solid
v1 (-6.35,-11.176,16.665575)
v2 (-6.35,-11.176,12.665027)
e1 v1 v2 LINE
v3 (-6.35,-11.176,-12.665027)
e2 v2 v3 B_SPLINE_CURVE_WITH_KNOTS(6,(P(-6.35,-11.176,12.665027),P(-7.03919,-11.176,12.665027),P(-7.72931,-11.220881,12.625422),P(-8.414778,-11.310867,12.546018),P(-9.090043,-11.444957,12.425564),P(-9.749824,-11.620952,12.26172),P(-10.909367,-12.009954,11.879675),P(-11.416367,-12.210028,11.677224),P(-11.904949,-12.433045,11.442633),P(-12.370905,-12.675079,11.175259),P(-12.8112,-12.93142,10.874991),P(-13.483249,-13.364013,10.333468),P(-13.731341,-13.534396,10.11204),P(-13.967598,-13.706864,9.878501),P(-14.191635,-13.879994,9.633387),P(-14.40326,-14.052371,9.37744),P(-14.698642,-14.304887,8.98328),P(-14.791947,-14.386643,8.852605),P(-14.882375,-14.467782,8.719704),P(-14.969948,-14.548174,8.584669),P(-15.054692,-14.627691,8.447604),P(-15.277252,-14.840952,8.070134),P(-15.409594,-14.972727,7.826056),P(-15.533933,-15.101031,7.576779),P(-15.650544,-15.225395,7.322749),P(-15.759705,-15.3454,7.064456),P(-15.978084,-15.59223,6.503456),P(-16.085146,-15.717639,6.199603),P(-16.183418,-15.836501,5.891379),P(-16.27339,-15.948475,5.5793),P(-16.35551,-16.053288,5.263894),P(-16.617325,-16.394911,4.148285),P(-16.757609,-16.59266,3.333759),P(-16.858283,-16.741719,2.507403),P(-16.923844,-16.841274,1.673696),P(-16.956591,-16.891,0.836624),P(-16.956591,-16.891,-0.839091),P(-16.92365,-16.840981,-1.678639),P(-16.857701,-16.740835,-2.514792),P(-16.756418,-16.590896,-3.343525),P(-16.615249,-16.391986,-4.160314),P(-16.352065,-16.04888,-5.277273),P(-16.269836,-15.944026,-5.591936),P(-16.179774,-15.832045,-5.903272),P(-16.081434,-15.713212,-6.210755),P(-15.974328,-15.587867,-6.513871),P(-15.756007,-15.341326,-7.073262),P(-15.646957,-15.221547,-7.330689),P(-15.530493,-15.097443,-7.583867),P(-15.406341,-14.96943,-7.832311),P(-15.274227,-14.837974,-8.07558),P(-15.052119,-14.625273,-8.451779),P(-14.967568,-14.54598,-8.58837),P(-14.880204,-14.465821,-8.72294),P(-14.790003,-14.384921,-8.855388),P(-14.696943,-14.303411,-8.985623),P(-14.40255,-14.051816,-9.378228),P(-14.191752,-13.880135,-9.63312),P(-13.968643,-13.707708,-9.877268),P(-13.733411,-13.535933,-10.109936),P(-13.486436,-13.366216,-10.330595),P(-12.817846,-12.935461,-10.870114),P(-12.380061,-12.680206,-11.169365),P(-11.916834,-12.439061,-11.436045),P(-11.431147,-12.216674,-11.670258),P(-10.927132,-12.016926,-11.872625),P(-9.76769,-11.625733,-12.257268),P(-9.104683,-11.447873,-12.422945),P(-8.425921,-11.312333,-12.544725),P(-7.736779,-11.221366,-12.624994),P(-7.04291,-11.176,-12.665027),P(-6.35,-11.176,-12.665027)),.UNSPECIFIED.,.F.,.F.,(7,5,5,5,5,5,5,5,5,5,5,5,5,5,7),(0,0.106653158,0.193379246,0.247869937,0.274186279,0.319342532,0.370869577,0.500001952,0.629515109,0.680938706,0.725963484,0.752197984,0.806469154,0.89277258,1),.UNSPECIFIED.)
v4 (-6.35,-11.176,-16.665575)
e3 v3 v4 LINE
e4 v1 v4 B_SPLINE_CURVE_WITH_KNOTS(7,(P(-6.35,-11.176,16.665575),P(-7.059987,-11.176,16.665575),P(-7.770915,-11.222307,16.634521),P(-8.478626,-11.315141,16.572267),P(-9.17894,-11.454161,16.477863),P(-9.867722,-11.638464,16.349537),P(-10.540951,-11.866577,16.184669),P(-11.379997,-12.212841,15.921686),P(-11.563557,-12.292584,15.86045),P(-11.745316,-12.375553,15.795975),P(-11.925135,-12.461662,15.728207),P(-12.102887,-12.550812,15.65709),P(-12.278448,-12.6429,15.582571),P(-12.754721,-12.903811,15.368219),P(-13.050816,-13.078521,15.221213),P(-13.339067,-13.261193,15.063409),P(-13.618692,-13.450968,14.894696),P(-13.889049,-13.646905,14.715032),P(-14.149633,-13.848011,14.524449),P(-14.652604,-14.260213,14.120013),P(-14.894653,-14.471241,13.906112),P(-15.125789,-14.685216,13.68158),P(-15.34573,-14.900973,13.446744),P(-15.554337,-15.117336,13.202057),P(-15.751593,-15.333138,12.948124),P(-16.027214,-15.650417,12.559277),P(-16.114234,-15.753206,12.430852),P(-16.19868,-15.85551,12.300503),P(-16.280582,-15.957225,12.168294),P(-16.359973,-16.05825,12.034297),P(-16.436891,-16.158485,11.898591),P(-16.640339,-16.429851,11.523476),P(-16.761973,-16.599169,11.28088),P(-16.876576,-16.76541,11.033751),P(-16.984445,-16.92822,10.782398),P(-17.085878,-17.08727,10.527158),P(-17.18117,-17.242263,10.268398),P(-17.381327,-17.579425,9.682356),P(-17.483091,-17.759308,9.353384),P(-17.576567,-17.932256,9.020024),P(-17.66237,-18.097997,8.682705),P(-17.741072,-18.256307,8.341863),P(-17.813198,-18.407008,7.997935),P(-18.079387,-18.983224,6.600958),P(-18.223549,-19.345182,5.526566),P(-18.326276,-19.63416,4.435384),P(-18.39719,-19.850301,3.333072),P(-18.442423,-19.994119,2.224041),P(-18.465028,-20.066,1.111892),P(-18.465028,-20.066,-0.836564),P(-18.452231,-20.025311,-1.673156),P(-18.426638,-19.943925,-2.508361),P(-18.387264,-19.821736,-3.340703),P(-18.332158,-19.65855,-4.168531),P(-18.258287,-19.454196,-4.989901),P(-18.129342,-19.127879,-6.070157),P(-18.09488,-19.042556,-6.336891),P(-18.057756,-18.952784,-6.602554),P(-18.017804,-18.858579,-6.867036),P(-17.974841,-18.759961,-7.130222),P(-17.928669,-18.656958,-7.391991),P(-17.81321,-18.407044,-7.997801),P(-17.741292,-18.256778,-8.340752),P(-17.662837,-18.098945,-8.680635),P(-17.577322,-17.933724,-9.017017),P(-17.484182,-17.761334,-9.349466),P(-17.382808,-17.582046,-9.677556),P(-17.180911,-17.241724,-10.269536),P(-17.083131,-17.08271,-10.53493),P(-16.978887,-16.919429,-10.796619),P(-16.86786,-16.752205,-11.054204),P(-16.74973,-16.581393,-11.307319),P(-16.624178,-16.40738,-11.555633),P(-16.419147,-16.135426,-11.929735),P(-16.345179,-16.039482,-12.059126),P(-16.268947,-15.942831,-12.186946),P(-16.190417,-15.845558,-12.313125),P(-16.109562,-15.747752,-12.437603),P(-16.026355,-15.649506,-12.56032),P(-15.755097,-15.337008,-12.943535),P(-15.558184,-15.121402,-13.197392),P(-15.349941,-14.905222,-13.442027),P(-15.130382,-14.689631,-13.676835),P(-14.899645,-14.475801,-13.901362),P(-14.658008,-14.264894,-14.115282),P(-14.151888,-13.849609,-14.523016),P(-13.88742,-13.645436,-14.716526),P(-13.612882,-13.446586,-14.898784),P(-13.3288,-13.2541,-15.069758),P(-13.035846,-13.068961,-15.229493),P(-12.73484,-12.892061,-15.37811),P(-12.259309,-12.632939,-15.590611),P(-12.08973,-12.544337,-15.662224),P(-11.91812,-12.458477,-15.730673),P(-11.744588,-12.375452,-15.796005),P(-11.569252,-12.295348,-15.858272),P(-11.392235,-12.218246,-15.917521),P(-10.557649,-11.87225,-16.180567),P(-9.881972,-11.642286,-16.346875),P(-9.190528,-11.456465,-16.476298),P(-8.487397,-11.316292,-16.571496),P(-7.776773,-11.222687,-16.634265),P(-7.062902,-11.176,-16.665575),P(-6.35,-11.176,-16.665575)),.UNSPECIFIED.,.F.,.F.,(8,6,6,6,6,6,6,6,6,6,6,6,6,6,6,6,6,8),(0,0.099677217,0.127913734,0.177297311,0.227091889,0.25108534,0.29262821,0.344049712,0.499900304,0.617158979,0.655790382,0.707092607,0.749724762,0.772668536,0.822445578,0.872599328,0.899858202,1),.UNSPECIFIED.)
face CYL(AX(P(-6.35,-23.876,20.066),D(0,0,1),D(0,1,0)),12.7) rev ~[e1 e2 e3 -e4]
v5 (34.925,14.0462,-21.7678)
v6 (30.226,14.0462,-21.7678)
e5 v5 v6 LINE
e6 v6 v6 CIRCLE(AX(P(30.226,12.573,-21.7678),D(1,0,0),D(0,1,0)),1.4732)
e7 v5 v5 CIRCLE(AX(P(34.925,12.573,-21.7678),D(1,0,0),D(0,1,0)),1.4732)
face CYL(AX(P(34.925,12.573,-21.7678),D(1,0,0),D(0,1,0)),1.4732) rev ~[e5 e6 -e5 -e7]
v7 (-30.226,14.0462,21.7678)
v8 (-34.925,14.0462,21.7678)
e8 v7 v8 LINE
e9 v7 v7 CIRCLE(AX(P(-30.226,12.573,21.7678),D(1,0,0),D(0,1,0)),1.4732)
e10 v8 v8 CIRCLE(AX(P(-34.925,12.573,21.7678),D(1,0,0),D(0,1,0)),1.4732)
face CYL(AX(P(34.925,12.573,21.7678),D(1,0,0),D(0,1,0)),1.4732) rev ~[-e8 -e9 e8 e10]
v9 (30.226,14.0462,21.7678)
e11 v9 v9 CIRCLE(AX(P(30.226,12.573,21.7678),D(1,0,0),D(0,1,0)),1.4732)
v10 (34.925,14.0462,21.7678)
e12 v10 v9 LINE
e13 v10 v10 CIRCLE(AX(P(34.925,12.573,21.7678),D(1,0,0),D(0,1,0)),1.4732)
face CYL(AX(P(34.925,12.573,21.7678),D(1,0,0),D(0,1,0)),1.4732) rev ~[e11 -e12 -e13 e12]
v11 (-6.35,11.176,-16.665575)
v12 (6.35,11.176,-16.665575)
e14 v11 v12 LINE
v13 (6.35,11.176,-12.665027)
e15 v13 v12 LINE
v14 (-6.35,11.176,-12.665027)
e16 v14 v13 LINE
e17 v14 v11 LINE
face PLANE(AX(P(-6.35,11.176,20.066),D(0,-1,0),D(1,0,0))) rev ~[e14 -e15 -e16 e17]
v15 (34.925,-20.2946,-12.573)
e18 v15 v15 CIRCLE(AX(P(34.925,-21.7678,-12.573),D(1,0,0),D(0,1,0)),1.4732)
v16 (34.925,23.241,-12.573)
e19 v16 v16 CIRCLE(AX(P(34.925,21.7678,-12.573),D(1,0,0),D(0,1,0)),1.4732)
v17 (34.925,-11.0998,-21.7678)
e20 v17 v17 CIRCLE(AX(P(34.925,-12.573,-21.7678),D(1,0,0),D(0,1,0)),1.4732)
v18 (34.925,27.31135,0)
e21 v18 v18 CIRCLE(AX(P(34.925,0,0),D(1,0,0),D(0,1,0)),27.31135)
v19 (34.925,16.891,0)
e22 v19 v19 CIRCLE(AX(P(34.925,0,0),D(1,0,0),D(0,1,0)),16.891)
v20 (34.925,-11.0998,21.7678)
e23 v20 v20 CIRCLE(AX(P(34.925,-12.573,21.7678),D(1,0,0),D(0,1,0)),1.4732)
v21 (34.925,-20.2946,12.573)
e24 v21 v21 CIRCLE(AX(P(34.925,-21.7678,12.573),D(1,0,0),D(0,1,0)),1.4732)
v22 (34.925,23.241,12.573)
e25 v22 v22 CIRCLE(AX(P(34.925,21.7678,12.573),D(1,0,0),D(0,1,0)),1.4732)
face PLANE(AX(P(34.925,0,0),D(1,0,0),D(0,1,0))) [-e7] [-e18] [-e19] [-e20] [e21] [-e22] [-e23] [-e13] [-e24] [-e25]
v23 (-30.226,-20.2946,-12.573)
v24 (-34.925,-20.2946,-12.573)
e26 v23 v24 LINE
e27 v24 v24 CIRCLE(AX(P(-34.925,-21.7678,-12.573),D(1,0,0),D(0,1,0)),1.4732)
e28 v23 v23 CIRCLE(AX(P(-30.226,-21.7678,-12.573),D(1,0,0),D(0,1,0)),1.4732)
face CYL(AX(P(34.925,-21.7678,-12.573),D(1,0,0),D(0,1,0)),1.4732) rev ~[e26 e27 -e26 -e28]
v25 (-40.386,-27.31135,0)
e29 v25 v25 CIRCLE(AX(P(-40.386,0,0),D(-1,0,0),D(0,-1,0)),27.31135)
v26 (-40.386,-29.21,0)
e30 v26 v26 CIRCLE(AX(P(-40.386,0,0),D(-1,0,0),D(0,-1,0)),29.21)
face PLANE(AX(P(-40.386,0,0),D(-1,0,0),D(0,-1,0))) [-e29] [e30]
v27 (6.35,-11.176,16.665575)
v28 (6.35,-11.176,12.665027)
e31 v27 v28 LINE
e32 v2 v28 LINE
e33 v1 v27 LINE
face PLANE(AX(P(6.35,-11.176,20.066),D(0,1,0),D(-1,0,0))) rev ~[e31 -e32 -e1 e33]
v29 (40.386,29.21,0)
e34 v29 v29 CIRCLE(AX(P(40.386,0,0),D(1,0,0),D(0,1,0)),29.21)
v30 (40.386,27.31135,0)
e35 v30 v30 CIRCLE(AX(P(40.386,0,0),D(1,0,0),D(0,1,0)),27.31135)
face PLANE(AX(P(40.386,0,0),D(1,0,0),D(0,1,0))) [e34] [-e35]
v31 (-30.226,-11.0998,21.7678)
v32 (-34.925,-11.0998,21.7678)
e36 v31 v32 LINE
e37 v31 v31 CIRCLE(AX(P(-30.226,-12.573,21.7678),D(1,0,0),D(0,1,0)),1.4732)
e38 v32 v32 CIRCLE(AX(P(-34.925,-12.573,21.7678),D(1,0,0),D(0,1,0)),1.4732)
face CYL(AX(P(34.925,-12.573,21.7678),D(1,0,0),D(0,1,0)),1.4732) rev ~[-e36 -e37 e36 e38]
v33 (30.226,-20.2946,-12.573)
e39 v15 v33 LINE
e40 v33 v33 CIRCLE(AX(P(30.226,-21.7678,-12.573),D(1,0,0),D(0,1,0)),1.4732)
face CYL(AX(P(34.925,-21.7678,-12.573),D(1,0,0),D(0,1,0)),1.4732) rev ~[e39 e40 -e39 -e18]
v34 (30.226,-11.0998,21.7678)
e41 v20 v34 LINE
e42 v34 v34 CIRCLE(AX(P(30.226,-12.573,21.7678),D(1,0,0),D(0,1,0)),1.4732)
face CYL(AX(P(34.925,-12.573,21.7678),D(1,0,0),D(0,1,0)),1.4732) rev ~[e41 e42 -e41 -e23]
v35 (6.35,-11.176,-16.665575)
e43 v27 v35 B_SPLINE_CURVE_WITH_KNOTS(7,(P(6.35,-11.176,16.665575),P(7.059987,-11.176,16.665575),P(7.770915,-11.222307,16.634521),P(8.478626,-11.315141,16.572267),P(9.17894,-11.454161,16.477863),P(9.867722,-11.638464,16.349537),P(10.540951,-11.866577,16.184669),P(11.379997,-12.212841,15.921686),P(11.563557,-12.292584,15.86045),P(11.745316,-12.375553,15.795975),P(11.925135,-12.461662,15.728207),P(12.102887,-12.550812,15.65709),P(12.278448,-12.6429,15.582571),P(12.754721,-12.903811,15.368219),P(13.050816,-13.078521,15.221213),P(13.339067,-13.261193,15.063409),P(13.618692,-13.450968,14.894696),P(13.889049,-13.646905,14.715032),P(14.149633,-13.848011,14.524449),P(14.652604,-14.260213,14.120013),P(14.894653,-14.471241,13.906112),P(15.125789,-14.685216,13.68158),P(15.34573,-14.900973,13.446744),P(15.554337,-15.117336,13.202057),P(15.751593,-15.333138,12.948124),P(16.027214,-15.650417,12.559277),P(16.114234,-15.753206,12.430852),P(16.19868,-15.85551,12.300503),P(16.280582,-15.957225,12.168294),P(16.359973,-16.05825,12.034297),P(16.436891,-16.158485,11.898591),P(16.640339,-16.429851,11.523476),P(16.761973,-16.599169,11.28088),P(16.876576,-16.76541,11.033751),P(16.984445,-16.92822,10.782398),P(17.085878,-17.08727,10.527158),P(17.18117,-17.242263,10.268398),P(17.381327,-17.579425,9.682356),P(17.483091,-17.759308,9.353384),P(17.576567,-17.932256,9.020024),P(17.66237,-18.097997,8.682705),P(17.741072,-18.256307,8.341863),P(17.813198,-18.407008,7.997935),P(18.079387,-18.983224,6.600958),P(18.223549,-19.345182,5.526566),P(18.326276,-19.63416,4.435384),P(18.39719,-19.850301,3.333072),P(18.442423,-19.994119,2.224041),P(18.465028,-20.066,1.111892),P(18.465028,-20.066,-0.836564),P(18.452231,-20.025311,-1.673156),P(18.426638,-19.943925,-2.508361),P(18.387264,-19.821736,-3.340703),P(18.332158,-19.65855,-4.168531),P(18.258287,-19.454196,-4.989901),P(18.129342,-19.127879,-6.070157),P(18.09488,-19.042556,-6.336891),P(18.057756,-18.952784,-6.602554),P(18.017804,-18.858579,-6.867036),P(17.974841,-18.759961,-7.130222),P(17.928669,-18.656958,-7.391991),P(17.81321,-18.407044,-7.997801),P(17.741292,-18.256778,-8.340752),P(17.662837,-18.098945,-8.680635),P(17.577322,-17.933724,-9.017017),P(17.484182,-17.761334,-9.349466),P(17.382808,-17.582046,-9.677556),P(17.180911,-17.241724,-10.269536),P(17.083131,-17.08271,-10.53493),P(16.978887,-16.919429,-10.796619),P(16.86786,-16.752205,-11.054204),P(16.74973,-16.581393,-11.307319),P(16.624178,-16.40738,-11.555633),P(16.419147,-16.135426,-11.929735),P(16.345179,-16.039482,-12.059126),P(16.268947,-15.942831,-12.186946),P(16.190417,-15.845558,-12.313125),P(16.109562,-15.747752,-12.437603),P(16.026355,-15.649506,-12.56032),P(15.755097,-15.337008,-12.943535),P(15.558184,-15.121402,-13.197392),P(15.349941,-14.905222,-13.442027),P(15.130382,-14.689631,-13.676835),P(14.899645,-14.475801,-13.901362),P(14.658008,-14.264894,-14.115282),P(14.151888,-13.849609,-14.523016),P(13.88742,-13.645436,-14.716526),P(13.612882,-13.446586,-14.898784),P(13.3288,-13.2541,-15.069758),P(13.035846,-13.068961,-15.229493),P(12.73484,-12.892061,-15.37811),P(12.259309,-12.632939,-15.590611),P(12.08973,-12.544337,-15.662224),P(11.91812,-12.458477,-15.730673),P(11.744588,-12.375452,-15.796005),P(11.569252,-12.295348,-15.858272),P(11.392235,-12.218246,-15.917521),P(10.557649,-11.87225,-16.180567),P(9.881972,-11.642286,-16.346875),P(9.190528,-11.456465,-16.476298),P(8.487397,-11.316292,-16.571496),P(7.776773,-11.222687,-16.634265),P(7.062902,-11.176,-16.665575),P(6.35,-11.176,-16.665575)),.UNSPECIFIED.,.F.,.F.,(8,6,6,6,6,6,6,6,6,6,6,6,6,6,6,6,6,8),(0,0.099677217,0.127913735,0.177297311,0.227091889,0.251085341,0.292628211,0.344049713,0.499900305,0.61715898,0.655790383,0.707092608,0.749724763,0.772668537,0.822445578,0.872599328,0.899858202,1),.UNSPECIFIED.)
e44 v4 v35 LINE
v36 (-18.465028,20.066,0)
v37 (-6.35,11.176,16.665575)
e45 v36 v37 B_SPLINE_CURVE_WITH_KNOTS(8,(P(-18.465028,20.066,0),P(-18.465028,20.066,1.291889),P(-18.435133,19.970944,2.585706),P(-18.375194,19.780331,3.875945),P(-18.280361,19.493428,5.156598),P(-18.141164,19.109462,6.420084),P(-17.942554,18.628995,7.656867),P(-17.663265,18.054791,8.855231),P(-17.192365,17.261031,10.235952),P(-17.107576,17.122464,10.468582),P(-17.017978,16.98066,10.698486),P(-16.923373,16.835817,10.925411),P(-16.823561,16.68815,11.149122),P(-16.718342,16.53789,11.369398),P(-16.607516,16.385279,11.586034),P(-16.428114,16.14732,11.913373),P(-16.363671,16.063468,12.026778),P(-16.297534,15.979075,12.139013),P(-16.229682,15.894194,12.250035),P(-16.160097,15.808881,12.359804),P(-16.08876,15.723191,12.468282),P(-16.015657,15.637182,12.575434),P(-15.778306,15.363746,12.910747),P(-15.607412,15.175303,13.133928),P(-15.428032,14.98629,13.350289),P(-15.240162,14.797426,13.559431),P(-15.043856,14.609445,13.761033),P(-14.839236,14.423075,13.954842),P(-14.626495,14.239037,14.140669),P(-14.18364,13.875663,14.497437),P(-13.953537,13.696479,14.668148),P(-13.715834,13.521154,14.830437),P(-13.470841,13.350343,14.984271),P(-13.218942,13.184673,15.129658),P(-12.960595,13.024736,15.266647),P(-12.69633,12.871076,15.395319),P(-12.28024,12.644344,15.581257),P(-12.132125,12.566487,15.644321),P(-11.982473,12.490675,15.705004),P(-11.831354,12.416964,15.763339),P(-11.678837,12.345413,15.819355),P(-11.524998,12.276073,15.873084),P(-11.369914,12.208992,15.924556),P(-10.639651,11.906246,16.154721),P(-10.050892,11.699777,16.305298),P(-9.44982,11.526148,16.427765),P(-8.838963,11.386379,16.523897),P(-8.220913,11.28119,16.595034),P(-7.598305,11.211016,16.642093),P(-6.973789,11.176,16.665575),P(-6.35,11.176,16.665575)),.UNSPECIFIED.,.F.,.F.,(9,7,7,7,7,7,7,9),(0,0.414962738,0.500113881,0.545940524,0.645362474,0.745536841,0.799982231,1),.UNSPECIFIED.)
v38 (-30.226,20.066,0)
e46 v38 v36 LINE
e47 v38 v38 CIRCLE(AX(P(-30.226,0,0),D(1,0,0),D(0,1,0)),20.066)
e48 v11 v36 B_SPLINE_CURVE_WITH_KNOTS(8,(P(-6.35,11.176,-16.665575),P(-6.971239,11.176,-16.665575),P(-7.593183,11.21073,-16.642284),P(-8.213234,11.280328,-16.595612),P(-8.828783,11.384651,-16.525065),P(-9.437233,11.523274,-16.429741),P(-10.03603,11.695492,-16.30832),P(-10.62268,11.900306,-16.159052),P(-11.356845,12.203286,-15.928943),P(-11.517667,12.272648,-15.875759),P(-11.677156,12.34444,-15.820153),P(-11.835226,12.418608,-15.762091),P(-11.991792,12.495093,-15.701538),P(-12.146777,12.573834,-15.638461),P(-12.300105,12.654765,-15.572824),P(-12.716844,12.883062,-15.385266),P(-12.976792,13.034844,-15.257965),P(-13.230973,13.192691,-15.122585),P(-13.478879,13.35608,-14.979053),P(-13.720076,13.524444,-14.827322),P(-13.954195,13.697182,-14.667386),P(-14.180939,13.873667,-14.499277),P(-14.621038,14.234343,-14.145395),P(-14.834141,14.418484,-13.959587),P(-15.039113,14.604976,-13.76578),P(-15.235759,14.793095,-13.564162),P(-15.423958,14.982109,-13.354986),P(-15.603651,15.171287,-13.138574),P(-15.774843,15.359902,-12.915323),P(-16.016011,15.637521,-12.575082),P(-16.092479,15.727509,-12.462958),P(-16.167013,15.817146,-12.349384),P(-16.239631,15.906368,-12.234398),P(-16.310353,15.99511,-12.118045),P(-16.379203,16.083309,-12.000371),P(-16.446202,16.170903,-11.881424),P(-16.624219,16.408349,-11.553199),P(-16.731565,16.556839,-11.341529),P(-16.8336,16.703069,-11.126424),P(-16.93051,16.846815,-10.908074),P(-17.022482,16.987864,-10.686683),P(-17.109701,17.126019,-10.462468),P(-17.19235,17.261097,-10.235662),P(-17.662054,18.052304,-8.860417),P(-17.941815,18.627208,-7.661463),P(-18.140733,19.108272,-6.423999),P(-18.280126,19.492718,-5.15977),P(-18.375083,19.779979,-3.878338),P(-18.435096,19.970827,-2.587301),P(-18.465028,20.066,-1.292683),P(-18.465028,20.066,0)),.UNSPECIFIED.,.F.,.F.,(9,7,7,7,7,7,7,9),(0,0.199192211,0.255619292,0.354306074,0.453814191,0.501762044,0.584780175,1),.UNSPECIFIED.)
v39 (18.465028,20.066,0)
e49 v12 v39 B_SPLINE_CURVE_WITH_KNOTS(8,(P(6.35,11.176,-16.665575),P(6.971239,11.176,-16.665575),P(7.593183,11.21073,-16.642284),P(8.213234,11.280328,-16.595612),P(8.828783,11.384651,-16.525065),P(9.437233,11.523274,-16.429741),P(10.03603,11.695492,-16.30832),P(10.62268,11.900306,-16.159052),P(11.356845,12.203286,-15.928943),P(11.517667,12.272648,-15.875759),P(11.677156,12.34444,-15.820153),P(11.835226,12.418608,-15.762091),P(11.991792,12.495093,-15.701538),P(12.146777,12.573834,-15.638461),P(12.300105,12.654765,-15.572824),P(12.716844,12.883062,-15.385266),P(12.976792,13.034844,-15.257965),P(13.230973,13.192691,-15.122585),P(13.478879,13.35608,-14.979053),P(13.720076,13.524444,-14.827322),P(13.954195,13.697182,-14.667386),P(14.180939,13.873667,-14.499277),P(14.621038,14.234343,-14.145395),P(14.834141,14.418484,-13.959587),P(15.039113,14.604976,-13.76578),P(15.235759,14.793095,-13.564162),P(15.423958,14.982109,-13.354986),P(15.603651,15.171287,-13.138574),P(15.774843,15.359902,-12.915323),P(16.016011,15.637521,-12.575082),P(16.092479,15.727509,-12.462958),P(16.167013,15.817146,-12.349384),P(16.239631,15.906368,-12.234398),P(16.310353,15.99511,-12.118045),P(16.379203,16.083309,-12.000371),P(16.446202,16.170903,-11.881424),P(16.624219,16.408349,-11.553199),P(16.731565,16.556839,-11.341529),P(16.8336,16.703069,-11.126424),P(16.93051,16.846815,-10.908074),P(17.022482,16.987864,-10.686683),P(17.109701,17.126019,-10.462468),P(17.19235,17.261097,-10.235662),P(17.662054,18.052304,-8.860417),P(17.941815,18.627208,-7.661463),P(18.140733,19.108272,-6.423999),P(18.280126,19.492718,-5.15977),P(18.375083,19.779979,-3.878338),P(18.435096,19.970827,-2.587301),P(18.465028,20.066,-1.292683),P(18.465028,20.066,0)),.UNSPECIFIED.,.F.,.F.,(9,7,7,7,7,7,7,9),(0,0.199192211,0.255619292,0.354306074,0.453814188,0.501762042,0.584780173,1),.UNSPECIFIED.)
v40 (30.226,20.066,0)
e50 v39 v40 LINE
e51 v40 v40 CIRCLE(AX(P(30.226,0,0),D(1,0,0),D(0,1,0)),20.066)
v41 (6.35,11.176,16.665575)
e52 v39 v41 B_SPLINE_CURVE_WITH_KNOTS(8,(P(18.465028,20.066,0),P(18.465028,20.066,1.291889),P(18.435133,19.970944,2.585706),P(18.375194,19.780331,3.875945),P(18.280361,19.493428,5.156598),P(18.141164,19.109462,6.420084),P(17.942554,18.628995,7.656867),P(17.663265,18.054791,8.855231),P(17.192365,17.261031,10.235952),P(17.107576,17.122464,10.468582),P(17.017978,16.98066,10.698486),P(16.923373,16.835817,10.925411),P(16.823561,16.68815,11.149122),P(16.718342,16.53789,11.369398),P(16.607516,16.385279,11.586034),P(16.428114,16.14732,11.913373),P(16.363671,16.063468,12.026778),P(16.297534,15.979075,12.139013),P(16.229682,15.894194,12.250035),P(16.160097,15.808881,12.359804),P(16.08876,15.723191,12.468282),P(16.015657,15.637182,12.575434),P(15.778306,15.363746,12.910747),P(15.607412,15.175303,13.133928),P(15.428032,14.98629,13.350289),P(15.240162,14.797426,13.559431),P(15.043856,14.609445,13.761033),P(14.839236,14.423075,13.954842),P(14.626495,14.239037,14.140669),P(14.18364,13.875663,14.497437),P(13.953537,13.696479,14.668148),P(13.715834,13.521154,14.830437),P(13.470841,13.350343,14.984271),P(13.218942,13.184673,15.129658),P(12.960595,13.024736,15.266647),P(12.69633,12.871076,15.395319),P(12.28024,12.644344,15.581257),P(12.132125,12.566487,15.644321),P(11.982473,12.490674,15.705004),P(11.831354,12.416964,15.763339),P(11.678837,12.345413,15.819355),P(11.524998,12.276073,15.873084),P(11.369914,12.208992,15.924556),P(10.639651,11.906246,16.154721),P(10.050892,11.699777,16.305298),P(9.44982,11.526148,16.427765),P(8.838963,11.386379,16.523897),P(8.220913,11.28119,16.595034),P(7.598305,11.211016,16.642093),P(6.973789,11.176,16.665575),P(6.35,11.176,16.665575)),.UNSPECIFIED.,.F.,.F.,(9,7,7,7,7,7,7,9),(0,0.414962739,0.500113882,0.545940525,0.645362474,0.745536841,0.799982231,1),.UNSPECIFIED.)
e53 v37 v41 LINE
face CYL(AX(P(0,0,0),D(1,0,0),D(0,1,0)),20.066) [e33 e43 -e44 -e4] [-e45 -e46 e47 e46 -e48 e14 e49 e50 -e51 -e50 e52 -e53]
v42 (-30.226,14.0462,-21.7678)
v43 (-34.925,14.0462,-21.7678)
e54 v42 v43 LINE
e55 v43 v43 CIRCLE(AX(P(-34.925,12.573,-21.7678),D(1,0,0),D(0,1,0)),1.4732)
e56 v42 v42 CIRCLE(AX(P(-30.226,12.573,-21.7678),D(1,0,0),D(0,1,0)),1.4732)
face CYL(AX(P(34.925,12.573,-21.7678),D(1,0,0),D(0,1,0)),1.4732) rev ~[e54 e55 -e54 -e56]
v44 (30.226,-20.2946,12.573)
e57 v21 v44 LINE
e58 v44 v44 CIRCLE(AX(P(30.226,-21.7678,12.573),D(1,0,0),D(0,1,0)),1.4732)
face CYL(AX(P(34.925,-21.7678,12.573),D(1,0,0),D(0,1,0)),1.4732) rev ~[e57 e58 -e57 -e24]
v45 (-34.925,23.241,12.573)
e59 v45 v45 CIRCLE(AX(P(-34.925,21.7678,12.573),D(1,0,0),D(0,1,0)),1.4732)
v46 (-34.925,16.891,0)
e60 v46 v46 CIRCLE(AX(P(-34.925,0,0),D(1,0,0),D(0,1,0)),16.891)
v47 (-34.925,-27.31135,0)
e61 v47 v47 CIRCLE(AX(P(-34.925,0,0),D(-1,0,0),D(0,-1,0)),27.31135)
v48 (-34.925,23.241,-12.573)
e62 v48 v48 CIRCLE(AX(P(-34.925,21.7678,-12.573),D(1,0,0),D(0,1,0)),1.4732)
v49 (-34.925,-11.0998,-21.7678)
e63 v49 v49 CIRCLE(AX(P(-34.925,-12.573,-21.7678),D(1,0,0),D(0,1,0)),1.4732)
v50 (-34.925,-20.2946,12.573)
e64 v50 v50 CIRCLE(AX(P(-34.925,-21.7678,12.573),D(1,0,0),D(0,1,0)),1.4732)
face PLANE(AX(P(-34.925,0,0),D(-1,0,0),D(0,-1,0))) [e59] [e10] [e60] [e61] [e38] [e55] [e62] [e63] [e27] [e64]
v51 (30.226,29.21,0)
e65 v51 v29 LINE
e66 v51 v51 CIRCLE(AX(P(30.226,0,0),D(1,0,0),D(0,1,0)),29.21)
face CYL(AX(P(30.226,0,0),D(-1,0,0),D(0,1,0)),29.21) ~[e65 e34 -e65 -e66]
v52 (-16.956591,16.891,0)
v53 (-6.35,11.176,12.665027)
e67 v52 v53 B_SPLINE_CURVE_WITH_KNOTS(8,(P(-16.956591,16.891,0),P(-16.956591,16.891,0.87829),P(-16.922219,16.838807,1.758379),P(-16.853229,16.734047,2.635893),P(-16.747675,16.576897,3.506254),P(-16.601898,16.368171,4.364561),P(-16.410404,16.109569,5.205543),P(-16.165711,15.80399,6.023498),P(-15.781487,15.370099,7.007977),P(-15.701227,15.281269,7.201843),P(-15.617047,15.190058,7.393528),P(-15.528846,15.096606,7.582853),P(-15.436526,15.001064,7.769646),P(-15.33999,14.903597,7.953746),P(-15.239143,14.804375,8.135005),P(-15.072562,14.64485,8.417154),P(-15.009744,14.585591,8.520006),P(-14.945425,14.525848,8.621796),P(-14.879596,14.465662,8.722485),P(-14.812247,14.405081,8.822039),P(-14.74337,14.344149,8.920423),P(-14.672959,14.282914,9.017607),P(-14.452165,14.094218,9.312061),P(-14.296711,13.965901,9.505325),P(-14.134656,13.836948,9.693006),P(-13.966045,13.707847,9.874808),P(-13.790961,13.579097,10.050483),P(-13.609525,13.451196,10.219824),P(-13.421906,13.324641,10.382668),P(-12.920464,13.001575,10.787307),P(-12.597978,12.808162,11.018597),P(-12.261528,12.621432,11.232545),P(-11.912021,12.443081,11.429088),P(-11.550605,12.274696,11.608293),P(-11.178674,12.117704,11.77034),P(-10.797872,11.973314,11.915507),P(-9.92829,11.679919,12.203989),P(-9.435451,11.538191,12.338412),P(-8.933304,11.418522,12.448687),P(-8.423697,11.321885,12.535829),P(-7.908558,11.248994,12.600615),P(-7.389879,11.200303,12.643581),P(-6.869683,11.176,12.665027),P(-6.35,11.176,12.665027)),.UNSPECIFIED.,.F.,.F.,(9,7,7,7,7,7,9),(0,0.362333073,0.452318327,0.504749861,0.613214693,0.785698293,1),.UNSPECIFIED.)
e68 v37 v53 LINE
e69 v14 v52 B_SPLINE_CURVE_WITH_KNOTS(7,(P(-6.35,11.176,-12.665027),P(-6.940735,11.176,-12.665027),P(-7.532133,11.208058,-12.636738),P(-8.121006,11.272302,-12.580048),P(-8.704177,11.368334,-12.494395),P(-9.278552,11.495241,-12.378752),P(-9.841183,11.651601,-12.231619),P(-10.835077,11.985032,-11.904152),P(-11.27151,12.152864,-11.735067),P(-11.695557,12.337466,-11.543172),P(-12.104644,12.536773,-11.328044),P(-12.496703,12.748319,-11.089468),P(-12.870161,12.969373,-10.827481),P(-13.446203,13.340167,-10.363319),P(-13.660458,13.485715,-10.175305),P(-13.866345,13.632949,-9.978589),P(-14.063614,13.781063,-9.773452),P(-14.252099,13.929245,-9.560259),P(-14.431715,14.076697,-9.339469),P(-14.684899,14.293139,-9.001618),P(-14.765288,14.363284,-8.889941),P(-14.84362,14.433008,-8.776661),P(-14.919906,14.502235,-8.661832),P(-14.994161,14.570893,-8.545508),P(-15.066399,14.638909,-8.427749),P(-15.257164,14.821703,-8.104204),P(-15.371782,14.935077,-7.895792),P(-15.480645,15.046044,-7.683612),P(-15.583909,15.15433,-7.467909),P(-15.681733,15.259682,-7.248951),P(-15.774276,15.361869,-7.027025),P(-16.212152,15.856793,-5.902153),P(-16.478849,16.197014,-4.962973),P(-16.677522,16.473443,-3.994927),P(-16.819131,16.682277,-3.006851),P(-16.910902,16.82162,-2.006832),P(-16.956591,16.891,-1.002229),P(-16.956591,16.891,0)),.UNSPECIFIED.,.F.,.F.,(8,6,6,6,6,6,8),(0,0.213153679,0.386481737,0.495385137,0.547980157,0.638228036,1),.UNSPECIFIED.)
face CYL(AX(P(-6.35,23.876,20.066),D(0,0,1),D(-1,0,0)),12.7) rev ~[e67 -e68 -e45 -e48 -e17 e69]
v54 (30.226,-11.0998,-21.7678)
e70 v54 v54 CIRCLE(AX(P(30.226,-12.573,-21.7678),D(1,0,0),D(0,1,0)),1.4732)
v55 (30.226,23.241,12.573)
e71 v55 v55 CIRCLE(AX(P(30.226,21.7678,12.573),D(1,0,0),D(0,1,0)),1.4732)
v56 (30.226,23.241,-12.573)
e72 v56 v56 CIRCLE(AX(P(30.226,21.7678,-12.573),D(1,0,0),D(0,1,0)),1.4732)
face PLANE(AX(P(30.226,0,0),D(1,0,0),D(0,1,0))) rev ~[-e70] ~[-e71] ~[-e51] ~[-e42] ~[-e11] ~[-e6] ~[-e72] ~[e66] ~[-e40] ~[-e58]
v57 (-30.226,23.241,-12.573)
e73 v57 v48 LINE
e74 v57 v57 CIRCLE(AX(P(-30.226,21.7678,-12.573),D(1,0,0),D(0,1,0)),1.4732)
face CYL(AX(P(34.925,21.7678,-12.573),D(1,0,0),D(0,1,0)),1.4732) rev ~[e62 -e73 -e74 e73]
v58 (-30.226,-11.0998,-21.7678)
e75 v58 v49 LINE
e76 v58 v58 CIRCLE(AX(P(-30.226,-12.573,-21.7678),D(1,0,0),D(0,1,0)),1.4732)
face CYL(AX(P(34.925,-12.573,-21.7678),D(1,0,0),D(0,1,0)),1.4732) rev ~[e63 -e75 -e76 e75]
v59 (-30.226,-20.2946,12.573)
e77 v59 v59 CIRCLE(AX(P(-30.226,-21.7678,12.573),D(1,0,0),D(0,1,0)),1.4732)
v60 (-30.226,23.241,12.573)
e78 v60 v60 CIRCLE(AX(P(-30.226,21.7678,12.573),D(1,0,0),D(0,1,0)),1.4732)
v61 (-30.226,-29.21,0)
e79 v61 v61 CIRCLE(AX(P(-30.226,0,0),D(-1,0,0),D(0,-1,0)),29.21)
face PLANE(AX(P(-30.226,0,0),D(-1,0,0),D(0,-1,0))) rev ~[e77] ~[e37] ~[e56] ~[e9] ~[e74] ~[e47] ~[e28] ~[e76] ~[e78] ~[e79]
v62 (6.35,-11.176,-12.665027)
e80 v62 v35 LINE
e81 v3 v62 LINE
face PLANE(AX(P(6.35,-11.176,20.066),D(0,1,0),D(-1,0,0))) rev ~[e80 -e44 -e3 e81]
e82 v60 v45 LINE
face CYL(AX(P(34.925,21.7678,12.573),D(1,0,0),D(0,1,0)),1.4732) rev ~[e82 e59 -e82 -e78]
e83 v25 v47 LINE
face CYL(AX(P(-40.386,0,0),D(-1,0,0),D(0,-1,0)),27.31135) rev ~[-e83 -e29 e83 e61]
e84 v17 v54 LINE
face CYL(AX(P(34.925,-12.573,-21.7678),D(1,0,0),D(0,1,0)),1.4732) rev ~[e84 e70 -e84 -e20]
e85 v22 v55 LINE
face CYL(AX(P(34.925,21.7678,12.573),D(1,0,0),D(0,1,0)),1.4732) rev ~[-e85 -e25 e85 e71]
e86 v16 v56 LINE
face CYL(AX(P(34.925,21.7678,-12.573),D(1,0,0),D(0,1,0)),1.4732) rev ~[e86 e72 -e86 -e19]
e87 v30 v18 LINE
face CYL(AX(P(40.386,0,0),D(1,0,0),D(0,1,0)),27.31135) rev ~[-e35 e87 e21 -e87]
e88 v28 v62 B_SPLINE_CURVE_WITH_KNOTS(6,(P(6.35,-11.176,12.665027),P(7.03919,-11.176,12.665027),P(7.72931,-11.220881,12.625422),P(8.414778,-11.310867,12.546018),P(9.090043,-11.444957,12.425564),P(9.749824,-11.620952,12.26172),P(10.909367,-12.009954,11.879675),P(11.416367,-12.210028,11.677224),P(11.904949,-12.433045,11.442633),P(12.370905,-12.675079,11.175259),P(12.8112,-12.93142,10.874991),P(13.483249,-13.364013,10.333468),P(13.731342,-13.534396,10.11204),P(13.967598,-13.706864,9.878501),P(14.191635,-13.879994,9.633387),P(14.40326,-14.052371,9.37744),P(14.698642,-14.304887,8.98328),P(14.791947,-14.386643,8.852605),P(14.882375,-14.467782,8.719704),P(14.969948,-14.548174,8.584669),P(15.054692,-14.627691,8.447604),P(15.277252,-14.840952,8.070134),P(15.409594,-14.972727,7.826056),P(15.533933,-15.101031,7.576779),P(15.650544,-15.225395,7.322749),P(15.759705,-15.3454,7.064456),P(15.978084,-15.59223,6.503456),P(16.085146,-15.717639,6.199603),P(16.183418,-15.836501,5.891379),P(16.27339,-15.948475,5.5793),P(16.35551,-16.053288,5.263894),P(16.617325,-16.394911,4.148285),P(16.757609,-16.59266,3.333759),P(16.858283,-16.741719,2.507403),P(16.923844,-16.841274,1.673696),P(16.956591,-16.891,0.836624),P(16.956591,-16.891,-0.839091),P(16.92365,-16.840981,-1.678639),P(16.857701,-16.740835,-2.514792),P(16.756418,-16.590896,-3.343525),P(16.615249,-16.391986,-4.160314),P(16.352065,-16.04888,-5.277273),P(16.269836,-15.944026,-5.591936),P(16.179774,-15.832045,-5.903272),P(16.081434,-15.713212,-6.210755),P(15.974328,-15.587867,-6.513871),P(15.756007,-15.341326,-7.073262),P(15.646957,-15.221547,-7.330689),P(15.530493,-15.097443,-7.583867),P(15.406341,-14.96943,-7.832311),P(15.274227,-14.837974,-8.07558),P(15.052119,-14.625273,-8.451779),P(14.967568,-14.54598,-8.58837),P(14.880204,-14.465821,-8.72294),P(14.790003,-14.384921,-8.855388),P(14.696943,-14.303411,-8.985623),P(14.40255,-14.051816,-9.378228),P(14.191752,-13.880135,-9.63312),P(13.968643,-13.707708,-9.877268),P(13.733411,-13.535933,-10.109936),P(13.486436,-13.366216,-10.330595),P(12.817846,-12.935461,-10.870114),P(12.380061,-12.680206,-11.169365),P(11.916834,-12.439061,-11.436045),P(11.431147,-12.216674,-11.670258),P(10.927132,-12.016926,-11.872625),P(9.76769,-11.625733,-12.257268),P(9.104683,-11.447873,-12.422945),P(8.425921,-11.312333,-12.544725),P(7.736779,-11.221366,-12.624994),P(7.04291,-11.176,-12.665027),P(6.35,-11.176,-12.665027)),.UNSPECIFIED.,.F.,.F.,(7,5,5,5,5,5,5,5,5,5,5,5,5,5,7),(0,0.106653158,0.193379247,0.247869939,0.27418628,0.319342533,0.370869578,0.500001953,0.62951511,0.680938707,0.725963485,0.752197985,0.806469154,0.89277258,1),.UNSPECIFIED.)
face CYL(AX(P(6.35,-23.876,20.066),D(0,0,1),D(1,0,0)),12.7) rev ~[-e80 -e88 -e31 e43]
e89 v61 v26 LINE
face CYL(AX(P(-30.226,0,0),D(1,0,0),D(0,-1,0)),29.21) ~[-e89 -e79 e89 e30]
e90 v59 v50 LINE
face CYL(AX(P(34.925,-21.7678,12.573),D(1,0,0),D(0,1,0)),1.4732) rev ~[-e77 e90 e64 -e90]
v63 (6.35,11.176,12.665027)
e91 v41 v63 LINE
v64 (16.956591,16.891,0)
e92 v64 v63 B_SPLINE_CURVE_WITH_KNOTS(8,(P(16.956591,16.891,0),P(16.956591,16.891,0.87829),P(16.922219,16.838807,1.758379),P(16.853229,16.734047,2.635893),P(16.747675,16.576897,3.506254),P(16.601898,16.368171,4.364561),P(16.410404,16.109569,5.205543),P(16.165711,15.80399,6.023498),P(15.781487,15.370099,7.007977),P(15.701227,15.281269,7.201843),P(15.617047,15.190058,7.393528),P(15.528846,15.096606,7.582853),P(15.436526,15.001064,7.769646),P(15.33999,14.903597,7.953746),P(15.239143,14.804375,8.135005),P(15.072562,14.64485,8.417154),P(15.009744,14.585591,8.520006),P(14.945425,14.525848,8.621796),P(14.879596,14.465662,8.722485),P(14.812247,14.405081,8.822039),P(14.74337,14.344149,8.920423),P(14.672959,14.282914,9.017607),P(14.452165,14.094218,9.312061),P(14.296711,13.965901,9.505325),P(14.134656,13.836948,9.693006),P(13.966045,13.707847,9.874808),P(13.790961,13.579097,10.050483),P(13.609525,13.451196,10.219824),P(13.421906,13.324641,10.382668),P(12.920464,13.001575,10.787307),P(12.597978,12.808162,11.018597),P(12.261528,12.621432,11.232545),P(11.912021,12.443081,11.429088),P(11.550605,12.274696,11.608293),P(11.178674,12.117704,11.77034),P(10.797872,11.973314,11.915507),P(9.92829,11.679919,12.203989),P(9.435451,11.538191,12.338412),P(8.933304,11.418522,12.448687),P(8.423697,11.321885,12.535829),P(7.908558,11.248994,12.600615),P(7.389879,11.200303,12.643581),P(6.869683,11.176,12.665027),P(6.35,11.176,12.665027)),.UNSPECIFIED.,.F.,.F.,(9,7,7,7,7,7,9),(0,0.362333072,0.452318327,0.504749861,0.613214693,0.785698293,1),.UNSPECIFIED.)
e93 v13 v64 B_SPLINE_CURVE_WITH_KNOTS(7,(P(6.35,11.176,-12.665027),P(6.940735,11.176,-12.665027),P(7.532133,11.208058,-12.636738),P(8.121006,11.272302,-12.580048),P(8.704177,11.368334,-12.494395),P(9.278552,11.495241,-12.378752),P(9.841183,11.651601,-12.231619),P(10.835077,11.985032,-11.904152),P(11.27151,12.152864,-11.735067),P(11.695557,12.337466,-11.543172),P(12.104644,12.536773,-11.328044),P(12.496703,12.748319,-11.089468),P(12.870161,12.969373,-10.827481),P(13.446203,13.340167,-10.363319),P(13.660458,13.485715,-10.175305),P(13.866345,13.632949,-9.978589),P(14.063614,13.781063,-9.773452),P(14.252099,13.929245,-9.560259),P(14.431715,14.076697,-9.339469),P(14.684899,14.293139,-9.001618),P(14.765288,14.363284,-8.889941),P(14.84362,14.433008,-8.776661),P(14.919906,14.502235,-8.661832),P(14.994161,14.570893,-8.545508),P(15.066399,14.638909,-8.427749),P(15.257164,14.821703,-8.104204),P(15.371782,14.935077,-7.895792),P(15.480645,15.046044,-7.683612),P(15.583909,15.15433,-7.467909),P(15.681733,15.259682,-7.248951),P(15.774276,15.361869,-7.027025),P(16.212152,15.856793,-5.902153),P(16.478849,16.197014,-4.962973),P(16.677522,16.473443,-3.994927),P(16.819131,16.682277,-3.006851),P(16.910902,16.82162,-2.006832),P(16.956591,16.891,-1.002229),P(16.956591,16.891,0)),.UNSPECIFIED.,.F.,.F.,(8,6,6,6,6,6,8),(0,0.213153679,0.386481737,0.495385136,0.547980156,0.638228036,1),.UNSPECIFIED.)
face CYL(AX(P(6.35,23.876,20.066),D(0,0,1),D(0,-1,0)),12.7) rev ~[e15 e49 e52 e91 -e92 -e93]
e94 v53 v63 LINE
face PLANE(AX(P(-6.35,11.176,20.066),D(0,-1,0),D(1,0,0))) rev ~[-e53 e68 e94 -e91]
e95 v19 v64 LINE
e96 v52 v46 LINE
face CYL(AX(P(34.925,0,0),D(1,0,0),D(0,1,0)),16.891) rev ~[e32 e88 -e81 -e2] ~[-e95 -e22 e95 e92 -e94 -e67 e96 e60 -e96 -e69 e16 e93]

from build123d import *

# Parameters (mm, degrees)
F0_R          = 20.066
F1_DEPTH      = 30.226
F1_DEPTH_BACK = 30.226
F2_R          = 29.21
F2_R_2        = 20.066
F3_DEPTH      = 10.16
F4_R          = 29.21
F4_R_2        = 20.066
F5_DEPTH      = 10.16
F6_R          = 27.31135
F7_DEPTH      = 5.461
F8_R          = 27.31135
F9_DEPTH      = 5.461
F10_R         = 16.891
F11_DEPTH     = 75.312
F12_R         = 1.4732
F13_DEPTH     = 75.312
F16_DEPTH     = 49.277


with BuildPart() as f1:
    # F0 (on Right) → F1 (new body, two sides)
    with BuildSketch(Plane.YZ) as f1_sk:
        Circle(F0_R)
    extrude(amount=F1_DEPTH)
    extrude(f1_sk.sketch, amount=-F1_DEPTH_BACK)

    # F2 (on face) → F3 (join)
    with BuildSketch(Plane.YZ.offset(30.226)):
        Circle(F2_R)
        Circle(F2_R_2, mode=Mode.SUBTRACT)
        Circle(F2_R_2)
    extrude(amount=F3_DEPTH)

    # F4 (on face) → F5 (join)
    with BuildSketch(Plane(origin=(-30.226, 0, 0), x_dir=(0, -1, 0), z_dir=(-1, 0, 0))):
        Circle(F4_R)
        Circle(F4_R_2, mode=Mode.SUBTRACT)
        Circle(F4_R_2)
    extrude(amount=F5_DEPTH)

    # F6 (on face) → F7 (cut)
    with BuildSketch(Plane(origin=(-40.386, 0, 0), x_dir=(0, -1, 0), z_dir=(-1, 0, 0))):
        Circle(F6_R)
    extrude(amount=-F7_DEPTH, mode=Mode.SUBTRACT)

    # F8 (on face) → F9 (cut)
    with BuildSketch(Plane.YZ.offset(40.386)):
        Circle(F8_R)
    extrude(amount=-F9_DEPTH, mode=Mode.SUBTRACT)

    # F10 (on face) → F11 (cut, through all)
    with BuildSketch(Plane.YZ.offset(34.925)):
        Circle(F10_R)
    extrude(amount=-F11_DEPTH, mode=Mode.SUBTRACT)

    # F12 (on face) → F13 (cut, through all)
    with BuildSketch(Plane.YZ.offset(34.925)):
        with Locations((-21.7678, 12.573)):
            Circle(F12_R)
        with Locations((-12.573, 21.7678)):
            Circle(F12_R)
        with Locations((12.573, 21.7678)):
            Circle(F12_R)
        with Locations((21.7678, 12.573)):
            Circle(F12_R)
        with Locations((21.7678, -12.573)):
            Circle(F12_R)
        with Locations((12.573, -21.7678)):
            Circle(F12_R)
        with Locations((-12.573, -21.7678)):
            Circle(F12_R)
        with Locations((-21.7678, -12.573)):
            Circle(F12_R)
    extrude(amount=-F13_DEPTH, mode=Mode.SUBTRACT)

    # F15 (on offset) → F16 (cut, through all)
    with BuildSketch(Plane.XY.offset(20.066)):
        with BuildLine():
            Line((19.05, 30.226), (-19.05, 30.226))
            Line((-19.05, 30.226), (-19.05, 23.876))
            ThreePointArc((-19.05, 23.876), (-15.3302561211, 14.8957438789), (-6.35, 11.176))
            Line((-6.35, 11.176), (6.35, 11.176))
            ThreePointArc((6.35, 11.176), (15.3302561211, 14.8957438789), (19.05, 23.876))
            Line((19.05, 23.876), (19.05, 30.226))
        make_face()
        with BuildLine():
            Line((6.35, -11.176), (-6.35, -11.176))
            ThreePointArc((-6.35, -11.176), (-15.3302561211, -14.8957438789), (-19.05, -23.876))
            Line((-19.05, -23.876), (-19.05, -30.226))
            Line((-19.05, -30.226), (19.05, -30.226))
            Line((19.05, -30.226), (19.05, -23.876))
            ThreePointArc((19.05, -23.876), (15.3302561211, -14.8957438789), (6.35, -11.176))
        make_face()
    extrude(amount=-F16_DEPTH, mode=Mode.SUBTRACT)


solid = f1.part
